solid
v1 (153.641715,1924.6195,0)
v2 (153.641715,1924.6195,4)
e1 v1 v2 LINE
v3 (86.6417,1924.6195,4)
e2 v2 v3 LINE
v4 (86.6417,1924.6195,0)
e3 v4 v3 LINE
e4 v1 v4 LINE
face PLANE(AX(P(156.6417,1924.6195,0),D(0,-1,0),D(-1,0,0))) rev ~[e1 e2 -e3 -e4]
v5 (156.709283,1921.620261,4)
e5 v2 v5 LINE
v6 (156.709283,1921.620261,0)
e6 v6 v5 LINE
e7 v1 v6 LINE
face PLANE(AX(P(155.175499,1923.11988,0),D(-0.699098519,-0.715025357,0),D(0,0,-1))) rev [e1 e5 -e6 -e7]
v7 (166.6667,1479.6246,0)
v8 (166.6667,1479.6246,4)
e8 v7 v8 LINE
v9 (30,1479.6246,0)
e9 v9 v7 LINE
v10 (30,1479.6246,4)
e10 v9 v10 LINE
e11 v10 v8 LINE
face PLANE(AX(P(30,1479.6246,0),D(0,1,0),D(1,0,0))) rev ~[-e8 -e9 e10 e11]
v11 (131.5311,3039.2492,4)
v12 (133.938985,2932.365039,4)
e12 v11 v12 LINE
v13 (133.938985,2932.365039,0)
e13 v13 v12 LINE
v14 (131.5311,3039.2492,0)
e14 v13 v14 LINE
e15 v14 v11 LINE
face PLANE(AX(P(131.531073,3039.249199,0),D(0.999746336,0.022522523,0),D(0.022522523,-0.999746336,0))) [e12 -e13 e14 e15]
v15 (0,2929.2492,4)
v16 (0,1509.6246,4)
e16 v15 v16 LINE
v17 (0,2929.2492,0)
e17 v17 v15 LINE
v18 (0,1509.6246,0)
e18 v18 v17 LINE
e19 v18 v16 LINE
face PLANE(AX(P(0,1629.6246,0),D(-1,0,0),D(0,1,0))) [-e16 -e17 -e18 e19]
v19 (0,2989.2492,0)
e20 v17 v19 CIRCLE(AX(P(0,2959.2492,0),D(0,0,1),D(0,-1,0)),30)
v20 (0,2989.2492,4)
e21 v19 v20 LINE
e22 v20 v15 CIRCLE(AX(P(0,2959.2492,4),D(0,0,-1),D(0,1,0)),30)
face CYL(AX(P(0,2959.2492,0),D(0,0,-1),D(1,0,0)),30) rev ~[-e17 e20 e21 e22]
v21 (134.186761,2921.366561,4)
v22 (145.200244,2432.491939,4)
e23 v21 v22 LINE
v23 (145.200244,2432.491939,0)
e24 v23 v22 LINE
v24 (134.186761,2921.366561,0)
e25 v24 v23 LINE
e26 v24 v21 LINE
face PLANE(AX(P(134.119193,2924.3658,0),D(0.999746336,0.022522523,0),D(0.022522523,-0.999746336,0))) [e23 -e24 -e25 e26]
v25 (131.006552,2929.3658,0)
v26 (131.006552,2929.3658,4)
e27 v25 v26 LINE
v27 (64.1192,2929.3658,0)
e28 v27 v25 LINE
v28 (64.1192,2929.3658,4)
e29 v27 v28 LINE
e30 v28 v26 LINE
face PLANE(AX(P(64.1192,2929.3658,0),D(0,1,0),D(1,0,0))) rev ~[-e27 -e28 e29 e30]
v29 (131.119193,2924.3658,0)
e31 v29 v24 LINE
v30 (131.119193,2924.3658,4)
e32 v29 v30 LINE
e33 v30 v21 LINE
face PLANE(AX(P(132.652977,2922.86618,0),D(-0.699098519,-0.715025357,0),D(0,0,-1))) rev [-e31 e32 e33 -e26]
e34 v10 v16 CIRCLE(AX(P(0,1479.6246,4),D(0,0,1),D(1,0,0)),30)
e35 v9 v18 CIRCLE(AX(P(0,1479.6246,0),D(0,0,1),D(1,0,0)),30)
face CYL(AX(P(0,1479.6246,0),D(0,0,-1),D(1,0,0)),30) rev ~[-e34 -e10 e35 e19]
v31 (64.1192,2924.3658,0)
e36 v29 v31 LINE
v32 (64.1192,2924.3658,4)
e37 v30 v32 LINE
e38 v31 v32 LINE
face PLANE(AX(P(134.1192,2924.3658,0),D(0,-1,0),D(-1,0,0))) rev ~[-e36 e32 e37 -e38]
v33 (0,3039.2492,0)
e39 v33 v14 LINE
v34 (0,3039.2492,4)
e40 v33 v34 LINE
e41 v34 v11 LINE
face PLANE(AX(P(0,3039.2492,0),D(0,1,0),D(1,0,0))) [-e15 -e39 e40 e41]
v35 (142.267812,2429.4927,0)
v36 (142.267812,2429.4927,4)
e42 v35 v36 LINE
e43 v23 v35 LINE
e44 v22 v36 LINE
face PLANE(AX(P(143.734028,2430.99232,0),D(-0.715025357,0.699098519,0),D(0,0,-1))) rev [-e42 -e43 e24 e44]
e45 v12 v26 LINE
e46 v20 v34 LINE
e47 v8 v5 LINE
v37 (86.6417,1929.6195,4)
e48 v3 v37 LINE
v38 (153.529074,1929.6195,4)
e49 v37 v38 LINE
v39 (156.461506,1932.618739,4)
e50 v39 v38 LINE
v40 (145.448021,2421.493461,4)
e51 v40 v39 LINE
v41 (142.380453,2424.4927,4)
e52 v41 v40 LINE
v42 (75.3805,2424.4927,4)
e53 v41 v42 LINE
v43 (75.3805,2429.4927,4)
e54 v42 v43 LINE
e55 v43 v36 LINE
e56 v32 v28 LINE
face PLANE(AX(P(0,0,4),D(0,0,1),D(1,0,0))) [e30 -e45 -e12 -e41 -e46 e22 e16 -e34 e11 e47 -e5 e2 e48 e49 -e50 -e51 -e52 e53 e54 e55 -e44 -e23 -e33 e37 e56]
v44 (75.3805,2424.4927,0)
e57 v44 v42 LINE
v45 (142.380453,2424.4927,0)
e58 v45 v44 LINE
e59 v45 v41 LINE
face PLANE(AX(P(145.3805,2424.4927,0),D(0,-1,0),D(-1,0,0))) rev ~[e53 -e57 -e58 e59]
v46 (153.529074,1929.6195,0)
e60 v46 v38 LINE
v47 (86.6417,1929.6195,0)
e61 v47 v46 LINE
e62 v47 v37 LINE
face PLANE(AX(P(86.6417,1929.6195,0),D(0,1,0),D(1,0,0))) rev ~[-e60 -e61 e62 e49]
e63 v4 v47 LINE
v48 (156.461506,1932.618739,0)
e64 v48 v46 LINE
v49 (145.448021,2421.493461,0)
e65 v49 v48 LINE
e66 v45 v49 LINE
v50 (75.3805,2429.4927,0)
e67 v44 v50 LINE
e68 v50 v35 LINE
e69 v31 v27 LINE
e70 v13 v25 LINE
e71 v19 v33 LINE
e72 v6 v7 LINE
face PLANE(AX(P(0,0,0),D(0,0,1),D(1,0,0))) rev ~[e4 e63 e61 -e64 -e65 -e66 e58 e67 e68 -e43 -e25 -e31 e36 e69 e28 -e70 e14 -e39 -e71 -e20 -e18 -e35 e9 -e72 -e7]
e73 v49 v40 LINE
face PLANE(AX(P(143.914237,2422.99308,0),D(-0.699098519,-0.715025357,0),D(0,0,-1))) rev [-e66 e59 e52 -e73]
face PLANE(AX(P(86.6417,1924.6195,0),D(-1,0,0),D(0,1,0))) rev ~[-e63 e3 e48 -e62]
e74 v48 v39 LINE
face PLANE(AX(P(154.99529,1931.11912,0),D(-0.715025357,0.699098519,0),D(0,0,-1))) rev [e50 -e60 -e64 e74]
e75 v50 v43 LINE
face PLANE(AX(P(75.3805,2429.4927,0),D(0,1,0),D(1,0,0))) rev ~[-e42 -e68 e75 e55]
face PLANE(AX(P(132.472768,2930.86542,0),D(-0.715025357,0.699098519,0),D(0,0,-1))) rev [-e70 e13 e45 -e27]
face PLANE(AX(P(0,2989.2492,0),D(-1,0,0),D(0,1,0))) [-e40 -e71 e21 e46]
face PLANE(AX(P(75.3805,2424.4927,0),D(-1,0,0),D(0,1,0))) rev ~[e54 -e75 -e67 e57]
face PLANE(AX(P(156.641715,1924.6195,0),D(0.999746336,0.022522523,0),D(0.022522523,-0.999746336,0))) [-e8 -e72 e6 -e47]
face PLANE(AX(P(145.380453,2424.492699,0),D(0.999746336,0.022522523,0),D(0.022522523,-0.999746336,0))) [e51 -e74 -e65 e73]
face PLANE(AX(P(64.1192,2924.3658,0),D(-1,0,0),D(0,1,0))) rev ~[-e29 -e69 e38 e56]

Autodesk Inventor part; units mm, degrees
ref_plane "YZ Plane" through (0, 0, 0) normal (1, 0, 0) x (0, 1, 0)
ref_plane "XZ Plane" through (0, 0, 0) normal (0, 1, 0) x (-1, 0, 0)
ref_plane "XY Plane" through (0, 0, 0) normal (0, 0, 1) x (1, 0, 0)
sketch "Sketch1" plane through (0, 0, 0) normal (0, 0, 1) x (1, 0, 0)
  line L0 (0, 0) -> (0, 4438.8737)
  line L1 (0, 4438.8737) -> (100, 4438.8737)
  line L2 (100, 4438.8737) -> (200, 0)
  line L3 (200, 0) -> (0, 0)
  circle A0 centre (0, 0) radius 30
  line L4 (0, 1479.6246) -> (166.6667, 1479.6246)
  line L5 (0, 2959.2492) -> (133.3333, 2959.2492)
  circle A1 centre (0, 1479.6246) radius 30
  circle A2 centre (0, 2959.2492) radius 30
  line L6 (190.4255, 425) -> (120.4255, 425)
  line L7 (120.4255, 425) -> (120.4255, 430)
  line L8 (120.4255, 430) -> (190.4255, 430)
  line L9 (190.4255, 430) -> (190.4255, 425)
  line L10 (109.1642, 929.8732) -> (179.1642, 929.8732)
  line L11 (179.1642, 924.8732) -> (109.1642, 924.8732)
  line L12 (109.1642, 924.8732) -> (109.1642, 929.8732)
  line L13 (179.1642, 929.8732) -> (179.1642, 924.8732)
  line L14 (97.903, 1429.7463) -> (167.903, 1429.7463)
  line L15 (167.903, 1424.7463) -> (97.903, 1424.7463)
  line L16 (97.903, 1424.7463) -> (97.903, 1429.7463)
  line L17 (167.903, 1429.7463) -> (167.903, 1424.7463)
  line L18 (86.6417, 1929.6195) -> (156.6417, 1929.6195)
  line L19 (156.6417, 1924.6195) -> (86.6417, 1924.6195)
  line L20 (86.6417, 1924.6195) -> (86.6417, 1929.6195)
  line L21 (156.6417, 1929.6195) -> (156.6417, 1924.6195)
  line L22 (75.3805, 2429.4927) -> (145.3805, 2429.4927)
  line L23 (145.3805, 2424.4927) -> (75.3805, 2424.4927)
  line L24 (75.3805, 2424.4927) -> (75.3805, 2429.4927)
  line L25 (145.3805, 2429.4927) -> (145.3805, 2424.4927)
  line L26 (64.1192, 2929.3658) -> (134.1192, 2929.3658)
  line L27 (134.1192, 2924.3658) -> (64.1192, 2924.3658)
  line L28 (64.1192, 2924.3658) -> (64.1192, 2929.3658)
  line L29 (134.1192, 2929.3658) -> (134.1192, 2924.3658)
  line L30 (52.8579, 3429.239) -> (122.8579, 3429.239)
  line L31 (122.8579, 3424.239) -> (52.8579, 3424.239)
  line L32 (52.8579, 3424.239) -> (52.8579, 3429.239)
  line L33 (122.8579, 3429.239) -> (122.8579, 3424.239)
  line L34 (41.5967, 3929.1122) -> (111.5967, 3929.1122)
  line L35 (111.5967, 3924.1122) -> (41.5967, 3924.1122)
  line L36 (41.5967, 3924.1122) -> (41.5967, 3929.1122)
  line L37 (111.5967, 3929.1122) -> (111.5967, 3924.1122)
  line L38 (0, 1629.6246) -> (163.2874, 1629.6246)
  line L39 (0, 3039.2492) -> (131.5311, 3039.2492)
  point P0 (30, 2959.2492)
  point P1 (0, 2929.2492)
  point P2 (0, 1509.6246)
  point P3 (0, 1449.6246)
  point P4 (0, 30)
  point P5 (30, 0)
  point P6 (190.3129, 430)
  point P7 (179.0516, 929.8732)
  point P8 (167.7903, 1429.7463)
  point P9 (30, 1479.6246)
  point P10 (156.5291, 1929.6195)
  point P11 (145.2678, 2429.4927)
  point P12 (134.0066, 2929.3658)
  point P13 (0, 2989.2492)
  dimension "d65" = 100
  dimension "d67" = 200
  dimension "d68" = 60
  dimension "d69" = 1480
  dimension "d70" = 1480
  dimension "d71" = 1480
  dimension "d72" = 5
  dimension "d73" = 70
  dimension "d74" = 430
  dimension "d77" = 500
  dimension "d82" = 80
  dimension "d83" = 150
extrude "Plate3" add sketch "Sketch1" along normal blind 4 contours L39 L2 L5 A2 L0 | L5 L2 L26 L28 L27 L22 L24 L23 L18 L20 L19 L38 L0 A2 | L38 L2 L4 A1 L0
chamfer "Corner Chamfer2" distance 3 angle 45 6 edges at (156.6417, 1924.6195, 2) (156.5291, 1929.6195, 2) (145.3805, 2424.4927, 2) (145.2678, 2429.4927, 2) (134.1192, 2924.3658, 2) (134.0066, 2929.3658, 2)
equation "\"BendRadius\" = Thickness"
equation "\"BendReliefWidth\" = Thickness"
equation "\"BendReliefDepth\" = 0.5 * Thickness"
equation "\"CornerReliefSize\" = 4 * Thickness"
equation "\"MinimumRemnant\" = 2 * Thickness"
equation "\"TransitionRadius\" = BendRadius"
equation "\"JacobiRadiusSize\" = BendRadius"
equation "\"GapSize\" = Thickness"
equation "\"Thickness\" = 4"
properties part number "GBK 3201 Center second rib" material "Steel"
